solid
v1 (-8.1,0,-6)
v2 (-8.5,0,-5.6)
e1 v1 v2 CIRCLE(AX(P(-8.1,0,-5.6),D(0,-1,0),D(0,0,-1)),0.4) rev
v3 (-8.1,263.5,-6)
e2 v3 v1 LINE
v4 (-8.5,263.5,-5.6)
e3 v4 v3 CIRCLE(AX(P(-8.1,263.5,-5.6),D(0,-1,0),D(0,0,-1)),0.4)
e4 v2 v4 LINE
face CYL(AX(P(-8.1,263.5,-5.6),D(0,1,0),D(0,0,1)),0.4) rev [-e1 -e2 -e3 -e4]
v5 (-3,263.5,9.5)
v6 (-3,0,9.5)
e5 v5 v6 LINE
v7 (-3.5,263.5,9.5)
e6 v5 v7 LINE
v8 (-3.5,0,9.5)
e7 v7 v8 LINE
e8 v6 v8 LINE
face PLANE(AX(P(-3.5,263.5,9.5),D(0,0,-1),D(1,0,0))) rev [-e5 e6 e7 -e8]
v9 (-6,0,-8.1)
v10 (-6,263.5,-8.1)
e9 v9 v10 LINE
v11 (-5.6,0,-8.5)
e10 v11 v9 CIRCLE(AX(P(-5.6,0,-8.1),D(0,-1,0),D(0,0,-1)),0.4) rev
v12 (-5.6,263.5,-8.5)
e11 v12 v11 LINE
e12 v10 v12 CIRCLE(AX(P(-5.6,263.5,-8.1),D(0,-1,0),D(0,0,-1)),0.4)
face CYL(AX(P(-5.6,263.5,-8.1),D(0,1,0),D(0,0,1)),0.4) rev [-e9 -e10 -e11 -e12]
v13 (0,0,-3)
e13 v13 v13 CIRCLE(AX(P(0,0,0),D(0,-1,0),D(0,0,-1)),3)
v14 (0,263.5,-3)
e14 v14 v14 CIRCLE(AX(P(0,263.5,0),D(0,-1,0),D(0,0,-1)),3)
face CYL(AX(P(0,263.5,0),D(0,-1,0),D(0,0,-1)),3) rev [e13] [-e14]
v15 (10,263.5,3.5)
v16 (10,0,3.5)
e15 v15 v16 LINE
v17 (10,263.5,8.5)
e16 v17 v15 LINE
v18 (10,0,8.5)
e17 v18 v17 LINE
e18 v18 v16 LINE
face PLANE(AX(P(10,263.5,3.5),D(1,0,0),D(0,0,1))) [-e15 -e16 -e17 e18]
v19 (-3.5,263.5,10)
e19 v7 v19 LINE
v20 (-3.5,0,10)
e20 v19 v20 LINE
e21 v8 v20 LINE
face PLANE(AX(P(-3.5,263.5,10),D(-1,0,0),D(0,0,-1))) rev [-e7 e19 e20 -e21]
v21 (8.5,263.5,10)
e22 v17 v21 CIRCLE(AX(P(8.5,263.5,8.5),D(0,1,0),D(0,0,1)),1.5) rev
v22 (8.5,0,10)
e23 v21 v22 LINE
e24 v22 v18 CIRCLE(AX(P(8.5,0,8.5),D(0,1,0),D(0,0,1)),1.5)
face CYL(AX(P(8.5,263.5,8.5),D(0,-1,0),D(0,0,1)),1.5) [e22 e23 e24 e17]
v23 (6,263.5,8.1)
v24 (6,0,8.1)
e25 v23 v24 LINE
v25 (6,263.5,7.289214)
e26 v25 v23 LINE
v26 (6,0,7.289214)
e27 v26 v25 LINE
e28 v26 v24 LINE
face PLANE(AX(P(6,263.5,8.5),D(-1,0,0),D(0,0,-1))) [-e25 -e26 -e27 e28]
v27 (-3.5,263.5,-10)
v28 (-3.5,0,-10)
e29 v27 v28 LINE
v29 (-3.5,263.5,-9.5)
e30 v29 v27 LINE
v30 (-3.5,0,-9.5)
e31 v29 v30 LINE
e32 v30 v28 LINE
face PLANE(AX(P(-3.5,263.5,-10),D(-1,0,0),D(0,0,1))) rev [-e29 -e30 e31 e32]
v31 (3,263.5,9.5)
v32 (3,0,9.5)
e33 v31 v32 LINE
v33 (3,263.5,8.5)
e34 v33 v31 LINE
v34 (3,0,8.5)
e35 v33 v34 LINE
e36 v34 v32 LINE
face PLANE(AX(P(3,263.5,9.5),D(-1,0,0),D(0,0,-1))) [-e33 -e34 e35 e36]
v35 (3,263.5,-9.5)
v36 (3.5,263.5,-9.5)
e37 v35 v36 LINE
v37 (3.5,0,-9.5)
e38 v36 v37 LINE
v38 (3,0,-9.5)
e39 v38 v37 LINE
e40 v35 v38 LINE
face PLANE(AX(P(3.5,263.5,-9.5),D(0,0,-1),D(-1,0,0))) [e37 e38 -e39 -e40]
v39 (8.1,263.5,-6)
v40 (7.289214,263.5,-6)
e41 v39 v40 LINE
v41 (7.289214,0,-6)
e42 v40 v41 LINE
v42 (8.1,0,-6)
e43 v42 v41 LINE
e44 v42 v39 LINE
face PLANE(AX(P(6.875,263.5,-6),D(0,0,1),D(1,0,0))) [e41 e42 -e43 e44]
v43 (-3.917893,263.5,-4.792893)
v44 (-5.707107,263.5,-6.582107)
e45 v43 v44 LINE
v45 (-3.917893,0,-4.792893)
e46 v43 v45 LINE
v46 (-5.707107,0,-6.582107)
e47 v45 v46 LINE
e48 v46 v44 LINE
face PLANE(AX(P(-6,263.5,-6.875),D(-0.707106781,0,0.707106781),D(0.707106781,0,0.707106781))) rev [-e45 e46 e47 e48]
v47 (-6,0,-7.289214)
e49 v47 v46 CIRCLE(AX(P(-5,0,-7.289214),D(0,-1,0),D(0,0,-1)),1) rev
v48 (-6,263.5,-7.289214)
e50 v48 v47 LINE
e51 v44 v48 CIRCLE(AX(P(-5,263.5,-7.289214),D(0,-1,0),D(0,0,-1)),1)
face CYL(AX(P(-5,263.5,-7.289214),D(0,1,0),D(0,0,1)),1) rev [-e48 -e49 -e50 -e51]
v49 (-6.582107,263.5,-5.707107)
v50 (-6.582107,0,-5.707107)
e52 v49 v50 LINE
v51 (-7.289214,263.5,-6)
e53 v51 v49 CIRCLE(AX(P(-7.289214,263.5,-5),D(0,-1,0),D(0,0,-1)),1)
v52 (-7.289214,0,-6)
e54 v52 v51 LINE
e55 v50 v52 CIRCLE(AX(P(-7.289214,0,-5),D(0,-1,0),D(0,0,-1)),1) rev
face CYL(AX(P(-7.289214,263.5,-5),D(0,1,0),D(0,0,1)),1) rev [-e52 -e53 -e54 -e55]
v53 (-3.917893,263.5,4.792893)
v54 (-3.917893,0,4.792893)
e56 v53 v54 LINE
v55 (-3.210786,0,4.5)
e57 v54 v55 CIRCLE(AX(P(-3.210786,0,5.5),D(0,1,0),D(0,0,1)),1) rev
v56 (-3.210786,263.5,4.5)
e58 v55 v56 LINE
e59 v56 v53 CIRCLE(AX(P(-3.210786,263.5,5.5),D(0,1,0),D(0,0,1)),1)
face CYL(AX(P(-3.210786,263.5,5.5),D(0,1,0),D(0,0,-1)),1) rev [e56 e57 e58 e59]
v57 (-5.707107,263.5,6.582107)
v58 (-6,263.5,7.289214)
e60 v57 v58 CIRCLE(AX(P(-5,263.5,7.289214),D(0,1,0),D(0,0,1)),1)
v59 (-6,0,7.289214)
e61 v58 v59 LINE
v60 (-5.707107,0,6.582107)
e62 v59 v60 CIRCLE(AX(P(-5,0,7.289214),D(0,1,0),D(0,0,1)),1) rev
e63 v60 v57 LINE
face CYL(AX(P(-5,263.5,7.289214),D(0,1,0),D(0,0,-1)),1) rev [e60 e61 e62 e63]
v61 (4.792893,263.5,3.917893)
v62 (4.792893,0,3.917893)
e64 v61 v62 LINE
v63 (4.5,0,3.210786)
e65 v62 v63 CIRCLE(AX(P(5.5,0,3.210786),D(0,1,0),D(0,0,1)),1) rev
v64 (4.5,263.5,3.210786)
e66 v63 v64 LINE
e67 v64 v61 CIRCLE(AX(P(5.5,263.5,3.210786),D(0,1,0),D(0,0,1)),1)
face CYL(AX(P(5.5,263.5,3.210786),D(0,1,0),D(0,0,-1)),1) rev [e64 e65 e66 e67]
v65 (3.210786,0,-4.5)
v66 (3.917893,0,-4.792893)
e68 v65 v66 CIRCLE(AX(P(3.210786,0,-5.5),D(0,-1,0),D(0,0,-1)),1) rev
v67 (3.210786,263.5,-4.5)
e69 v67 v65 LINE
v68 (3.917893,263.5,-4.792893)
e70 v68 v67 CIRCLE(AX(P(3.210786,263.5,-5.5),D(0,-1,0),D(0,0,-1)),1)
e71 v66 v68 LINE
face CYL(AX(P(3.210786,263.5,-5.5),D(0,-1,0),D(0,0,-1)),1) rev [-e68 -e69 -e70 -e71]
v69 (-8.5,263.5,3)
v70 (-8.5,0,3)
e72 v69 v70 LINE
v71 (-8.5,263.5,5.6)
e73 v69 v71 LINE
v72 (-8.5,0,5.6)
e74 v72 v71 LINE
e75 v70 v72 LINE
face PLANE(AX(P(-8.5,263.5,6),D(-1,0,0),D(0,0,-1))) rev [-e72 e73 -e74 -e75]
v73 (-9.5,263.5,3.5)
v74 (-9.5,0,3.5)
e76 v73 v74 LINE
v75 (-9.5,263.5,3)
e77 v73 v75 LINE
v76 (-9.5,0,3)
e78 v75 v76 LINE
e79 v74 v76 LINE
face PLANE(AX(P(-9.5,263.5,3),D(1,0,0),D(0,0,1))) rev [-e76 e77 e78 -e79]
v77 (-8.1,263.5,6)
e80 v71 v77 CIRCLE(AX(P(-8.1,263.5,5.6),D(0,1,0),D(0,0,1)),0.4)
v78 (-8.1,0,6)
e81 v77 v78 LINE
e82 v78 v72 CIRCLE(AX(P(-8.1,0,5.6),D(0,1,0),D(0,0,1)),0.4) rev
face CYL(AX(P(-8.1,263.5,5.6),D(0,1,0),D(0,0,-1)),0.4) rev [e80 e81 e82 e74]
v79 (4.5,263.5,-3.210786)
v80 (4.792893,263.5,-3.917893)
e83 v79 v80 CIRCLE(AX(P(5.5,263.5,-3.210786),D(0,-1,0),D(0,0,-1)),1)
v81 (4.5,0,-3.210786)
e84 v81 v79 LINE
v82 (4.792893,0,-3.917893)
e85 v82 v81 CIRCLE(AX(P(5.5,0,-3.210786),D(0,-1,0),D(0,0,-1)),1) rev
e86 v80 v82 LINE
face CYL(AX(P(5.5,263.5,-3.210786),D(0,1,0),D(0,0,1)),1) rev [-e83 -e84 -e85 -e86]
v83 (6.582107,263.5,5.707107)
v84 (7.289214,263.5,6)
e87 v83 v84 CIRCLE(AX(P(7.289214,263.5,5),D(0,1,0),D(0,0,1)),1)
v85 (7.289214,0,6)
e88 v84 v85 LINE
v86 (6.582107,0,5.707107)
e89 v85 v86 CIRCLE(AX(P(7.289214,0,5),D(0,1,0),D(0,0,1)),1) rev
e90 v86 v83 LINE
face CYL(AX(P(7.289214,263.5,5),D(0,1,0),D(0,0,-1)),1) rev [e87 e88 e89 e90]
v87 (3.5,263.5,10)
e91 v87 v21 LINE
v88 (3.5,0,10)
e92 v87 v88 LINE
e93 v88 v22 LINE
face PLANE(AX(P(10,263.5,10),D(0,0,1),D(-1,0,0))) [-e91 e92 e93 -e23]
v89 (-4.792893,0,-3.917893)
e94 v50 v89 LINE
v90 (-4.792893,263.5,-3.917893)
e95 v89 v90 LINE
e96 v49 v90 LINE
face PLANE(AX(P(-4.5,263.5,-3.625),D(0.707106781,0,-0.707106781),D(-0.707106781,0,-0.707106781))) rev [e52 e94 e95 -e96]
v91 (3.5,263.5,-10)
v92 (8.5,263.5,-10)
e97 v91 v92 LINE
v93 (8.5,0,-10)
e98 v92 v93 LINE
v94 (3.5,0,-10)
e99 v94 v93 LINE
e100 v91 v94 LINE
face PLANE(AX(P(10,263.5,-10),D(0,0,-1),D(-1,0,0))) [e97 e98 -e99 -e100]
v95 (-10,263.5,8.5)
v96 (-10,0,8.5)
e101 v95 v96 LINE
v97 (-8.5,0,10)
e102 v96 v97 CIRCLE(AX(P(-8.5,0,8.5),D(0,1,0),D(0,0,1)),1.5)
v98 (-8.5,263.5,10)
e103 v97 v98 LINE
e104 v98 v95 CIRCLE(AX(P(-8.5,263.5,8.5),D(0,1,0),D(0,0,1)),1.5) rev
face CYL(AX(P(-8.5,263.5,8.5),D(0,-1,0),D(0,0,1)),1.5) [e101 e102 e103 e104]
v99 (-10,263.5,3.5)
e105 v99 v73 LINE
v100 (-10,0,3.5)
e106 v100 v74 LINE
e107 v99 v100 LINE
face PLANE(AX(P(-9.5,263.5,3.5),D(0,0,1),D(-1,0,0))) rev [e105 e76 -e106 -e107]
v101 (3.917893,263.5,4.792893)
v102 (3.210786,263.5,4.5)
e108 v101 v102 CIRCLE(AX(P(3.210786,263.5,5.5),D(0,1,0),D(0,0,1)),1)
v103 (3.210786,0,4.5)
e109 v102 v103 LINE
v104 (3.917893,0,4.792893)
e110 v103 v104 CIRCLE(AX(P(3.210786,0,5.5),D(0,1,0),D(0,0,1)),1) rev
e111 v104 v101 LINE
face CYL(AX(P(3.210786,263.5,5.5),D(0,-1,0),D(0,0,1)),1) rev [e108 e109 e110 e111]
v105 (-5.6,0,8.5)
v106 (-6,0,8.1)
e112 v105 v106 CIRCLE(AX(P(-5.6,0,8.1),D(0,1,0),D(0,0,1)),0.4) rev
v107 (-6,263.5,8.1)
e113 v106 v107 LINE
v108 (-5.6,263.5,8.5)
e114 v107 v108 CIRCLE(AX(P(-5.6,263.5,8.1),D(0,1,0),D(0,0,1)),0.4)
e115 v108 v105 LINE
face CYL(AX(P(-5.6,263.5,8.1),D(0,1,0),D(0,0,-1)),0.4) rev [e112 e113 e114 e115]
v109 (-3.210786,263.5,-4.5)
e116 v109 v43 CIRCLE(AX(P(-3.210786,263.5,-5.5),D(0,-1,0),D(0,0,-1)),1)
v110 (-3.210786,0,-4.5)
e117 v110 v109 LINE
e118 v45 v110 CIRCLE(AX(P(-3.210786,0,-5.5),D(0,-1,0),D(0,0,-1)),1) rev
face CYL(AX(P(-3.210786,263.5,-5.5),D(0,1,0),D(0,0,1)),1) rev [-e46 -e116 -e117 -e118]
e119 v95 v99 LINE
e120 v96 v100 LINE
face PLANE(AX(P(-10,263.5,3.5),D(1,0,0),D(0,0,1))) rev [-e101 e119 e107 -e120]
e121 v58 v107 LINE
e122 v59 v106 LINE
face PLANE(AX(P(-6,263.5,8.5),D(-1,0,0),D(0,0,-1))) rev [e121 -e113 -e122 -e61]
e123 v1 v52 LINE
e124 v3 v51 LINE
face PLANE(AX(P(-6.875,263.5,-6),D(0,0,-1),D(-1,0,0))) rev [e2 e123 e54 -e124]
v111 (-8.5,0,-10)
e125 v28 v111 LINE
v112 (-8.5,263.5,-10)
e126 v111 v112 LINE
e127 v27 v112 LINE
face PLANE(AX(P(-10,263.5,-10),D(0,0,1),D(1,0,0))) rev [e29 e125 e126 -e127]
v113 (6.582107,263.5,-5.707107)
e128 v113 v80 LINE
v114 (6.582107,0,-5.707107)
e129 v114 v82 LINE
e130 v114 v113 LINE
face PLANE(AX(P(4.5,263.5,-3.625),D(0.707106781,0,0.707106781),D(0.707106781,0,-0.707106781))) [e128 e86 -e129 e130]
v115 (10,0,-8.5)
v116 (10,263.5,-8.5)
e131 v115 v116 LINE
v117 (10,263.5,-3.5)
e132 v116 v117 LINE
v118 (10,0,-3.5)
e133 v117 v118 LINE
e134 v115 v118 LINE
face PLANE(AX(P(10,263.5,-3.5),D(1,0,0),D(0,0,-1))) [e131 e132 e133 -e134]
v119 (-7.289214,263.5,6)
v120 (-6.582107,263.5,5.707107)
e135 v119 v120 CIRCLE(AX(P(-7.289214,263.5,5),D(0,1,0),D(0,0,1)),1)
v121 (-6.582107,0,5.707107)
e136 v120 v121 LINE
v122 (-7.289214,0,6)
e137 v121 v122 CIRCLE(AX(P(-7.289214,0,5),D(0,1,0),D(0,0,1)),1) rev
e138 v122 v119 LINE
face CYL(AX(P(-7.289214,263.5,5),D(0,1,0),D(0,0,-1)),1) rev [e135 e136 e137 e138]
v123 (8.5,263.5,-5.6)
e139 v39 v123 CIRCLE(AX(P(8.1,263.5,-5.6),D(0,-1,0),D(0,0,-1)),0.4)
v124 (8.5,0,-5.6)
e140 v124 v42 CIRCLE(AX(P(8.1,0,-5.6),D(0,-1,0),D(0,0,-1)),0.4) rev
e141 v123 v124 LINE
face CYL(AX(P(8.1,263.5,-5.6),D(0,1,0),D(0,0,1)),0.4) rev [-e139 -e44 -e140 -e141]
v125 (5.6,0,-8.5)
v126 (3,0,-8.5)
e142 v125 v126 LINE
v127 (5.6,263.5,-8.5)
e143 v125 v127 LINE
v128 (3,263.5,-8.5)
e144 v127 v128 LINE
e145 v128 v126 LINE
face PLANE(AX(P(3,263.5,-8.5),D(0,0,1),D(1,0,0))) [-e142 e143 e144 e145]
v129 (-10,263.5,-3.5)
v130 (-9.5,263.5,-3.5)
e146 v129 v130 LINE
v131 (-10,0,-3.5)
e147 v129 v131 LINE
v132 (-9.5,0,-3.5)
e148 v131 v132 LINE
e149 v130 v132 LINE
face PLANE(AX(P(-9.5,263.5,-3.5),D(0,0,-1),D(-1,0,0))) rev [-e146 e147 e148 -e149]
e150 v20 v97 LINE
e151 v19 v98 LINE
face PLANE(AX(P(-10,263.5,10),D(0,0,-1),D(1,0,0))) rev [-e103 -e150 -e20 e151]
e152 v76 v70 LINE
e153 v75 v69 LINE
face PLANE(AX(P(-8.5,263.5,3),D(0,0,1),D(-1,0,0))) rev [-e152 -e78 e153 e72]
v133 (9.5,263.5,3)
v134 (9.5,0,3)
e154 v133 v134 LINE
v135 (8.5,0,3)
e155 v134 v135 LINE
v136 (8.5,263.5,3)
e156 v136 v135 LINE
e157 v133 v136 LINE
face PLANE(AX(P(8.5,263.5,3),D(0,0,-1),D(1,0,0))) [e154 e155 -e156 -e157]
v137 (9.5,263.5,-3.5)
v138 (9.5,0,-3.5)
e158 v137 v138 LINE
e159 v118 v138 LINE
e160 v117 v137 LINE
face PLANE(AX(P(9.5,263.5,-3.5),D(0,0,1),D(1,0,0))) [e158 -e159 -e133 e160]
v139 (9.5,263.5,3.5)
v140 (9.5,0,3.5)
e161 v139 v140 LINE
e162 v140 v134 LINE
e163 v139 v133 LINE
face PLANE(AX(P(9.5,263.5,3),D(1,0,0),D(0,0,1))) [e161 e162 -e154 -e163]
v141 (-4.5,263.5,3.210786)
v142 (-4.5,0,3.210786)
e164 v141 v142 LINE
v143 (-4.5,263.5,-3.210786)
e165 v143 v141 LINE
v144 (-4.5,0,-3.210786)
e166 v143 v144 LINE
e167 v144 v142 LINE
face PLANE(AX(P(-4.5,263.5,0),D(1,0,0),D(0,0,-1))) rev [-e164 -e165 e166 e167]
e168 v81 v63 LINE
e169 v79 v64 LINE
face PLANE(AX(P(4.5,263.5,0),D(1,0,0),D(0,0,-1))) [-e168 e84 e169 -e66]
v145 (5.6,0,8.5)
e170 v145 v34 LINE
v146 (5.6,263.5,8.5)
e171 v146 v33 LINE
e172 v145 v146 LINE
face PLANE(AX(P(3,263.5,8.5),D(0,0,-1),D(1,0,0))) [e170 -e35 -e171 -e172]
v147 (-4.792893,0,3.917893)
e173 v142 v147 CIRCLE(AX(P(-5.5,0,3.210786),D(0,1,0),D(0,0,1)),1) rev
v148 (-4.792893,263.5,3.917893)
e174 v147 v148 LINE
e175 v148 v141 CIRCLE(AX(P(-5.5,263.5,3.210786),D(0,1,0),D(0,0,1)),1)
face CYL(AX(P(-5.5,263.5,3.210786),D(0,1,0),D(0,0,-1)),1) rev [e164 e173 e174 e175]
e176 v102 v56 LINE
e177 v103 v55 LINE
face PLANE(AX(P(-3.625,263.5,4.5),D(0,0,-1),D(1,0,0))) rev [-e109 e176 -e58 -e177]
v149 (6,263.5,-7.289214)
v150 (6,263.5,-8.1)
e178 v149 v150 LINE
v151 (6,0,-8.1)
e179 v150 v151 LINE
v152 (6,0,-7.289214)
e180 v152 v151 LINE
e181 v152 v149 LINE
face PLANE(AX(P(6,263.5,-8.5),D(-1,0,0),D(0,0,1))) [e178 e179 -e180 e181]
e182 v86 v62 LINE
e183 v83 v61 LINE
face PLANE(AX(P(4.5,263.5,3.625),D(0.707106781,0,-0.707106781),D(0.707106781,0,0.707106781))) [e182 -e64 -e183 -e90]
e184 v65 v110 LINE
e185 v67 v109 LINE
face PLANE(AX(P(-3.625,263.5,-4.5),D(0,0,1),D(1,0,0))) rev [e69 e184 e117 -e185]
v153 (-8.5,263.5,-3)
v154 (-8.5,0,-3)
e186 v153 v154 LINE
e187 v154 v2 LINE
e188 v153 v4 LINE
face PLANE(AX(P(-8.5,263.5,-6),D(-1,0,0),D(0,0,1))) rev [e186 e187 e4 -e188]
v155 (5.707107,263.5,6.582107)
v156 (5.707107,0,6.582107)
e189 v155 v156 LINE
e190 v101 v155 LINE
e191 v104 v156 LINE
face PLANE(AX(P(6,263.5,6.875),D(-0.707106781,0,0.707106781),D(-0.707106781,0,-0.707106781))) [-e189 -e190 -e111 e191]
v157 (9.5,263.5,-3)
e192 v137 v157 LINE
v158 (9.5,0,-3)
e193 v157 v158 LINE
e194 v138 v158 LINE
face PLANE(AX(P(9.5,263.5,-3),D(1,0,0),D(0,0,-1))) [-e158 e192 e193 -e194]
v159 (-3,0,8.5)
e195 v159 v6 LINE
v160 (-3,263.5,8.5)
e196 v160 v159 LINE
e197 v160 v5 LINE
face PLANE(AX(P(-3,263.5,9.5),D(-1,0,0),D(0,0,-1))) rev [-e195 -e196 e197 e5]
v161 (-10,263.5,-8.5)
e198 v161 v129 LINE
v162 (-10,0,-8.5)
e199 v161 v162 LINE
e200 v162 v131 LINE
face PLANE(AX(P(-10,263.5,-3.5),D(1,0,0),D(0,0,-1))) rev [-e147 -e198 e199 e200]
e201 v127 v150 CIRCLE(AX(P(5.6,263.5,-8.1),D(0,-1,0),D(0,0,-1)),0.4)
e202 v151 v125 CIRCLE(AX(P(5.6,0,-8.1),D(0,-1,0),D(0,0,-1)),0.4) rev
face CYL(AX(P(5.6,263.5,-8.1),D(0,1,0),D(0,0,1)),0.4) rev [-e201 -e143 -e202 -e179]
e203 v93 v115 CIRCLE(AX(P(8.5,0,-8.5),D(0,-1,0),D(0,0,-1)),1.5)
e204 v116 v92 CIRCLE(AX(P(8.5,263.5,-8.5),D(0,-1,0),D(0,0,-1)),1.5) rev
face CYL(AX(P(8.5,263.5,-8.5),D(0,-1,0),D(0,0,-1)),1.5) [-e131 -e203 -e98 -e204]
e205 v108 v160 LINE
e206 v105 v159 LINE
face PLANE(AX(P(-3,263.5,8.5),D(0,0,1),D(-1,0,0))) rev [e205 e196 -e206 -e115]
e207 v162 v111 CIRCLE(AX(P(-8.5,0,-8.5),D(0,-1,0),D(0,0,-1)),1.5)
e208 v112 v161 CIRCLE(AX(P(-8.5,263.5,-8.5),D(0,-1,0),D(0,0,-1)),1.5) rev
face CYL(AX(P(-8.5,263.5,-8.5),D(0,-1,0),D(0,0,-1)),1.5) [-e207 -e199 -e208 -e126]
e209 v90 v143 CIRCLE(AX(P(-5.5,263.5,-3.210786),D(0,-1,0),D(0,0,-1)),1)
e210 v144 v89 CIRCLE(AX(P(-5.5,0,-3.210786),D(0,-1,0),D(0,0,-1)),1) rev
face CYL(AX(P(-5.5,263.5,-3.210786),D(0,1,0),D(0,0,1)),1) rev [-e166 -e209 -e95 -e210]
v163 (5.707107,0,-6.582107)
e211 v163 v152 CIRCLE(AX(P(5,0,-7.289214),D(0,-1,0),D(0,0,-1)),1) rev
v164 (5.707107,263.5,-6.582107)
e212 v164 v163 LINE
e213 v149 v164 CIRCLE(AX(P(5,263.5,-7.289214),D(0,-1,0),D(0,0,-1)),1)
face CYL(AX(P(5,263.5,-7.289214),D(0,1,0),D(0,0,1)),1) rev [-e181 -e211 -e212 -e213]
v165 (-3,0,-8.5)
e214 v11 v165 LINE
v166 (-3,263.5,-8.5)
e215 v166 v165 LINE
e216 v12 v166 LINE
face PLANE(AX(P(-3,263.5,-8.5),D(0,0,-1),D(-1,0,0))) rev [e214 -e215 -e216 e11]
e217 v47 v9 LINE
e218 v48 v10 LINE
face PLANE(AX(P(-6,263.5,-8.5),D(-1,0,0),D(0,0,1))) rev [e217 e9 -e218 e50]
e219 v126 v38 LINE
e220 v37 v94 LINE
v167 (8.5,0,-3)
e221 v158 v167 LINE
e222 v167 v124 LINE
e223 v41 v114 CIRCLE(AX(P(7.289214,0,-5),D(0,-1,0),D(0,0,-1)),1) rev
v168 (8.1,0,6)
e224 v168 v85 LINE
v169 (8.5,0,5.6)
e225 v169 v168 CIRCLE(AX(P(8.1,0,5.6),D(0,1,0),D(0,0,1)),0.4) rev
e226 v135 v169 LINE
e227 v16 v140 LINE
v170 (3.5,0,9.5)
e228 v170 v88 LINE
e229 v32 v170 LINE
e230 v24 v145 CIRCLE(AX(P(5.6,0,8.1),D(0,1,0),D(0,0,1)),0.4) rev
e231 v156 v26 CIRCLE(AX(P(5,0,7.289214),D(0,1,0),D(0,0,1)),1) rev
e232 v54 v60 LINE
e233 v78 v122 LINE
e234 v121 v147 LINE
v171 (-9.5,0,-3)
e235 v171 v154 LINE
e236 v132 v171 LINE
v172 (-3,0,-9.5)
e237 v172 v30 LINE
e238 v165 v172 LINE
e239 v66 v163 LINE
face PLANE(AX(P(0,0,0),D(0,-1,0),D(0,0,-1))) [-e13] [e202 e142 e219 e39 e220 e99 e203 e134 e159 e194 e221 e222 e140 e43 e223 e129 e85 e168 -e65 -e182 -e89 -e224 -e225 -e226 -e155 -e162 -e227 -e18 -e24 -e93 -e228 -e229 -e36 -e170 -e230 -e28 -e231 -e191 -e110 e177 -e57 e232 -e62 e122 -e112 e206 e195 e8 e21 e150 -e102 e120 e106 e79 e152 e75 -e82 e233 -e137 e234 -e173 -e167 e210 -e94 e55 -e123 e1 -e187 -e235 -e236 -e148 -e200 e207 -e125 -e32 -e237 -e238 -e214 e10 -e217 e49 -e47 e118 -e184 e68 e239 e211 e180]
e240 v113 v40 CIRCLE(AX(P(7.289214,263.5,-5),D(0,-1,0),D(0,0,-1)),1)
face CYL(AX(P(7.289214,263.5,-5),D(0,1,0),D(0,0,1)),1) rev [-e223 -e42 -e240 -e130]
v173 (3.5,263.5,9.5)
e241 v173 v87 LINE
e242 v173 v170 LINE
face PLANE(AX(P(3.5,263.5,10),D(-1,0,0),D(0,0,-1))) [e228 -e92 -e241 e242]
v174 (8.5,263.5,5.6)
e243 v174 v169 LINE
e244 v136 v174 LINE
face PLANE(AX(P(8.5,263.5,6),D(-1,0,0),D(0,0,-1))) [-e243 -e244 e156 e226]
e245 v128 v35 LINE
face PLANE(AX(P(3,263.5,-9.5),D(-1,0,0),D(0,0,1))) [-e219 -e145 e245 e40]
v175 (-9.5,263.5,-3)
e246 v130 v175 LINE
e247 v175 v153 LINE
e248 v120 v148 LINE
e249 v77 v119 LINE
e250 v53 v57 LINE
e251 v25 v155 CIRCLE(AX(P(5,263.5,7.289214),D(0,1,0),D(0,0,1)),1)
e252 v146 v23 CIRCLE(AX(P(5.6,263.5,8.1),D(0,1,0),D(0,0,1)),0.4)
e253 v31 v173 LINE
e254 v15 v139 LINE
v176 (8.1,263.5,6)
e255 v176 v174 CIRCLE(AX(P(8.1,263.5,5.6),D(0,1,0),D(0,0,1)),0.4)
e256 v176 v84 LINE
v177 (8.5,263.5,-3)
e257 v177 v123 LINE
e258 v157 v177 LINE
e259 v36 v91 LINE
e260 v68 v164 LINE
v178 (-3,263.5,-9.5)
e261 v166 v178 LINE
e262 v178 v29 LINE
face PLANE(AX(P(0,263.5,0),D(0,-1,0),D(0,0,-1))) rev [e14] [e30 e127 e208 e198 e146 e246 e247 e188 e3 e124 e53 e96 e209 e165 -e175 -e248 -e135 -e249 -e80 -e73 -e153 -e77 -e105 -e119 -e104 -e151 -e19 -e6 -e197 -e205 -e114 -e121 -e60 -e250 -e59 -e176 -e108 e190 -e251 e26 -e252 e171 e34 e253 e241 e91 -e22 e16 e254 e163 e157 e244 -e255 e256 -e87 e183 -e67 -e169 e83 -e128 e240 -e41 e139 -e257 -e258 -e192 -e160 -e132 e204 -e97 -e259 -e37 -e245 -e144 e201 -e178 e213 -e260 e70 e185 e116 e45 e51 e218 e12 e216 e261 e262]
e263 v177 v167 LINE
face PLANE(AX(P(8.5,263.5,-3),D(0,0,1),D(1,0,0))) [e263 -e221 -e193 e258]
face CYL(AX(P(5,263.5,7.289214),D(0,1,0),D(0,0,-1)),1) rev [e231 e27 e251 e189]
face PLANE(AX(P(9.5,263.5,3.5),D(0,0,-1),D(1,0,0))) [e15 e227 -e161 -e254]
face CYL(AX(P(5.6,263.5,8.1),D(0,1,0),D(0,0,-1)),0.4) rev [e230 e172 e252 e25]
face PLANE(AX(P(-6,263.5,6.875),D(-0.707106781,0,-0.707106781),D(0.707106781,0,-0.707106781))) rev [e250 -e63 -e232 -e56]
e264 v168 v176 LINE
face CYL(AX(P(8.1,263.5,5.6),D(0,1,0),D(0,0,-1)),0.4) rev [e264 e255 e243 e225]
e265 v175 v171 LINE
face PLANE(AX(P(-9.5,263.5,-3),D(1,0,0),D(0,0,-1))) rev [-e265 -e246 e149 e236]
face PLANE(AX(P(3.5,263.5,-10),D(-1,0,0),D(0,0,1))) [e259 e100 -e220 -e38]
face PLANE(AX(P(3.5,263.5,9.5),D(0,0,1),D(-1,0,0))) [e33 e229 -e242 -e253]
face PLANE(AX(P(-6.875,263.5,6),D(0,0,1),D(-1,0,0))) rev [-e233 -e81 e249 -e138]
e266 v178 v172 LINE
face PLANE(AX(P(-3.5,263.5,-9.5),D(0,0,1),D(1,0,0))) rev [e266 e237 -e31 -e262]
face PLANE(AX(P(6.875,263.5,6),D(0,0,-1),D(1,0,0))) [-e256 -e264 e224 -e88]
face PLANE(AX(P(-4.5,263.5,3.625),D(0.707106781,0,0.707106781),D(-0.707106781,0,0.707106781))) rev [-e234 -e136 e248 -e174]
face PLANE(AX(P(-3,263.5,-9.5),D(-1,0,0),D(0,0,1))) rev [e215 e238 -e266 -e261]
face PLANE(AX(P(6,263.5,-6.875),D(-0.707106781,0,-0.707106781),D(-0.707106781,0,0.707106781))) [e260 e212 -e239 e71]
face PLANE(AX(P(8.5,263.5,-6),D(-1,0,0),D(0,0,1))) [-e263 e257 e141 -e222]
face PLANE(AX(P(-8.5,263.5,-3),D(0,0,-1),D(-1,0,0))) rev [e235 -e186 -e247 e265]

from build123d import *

# Parameters (mm, degrees)
BOSS_EXTRU_1_CORPS_DEPTH    = 263.5
CONG_1_R                    = 1.5
CONG_2_R                    = 0.4
CONG_4_R                    = 1
CONG_1_OF_SYM_TRIE_BRAS_R   = 1.5
CONG_2_OF_SYM_TRIE_BRAS_R   = 0.4
CONG_4_OF_SYM_TRIE_BRAS_R   = 1
SYM_TRIE_BRAS_DOUBLE_DEPTH  = 263.5
APR_S_TARODAGE_M6_R         = 3
ENL_V_MAT_FILETAGE_M6_DEPTH = 264.879233741


# Read off the part's stored shape, not the designer's step: Symétrie Bras double
with BuildPart() as part:
    # Esquisse4 → Boss.-Extru.1 Corps (new body)
    with BuildSketch(Plane(origin=(0, 0, 0), x_dir=(1, 0, 0), z_dir=(0, 1, 0))):
        Polygon((0, 0), (-4.5, 0), (-4.5, 3.625), (-6.875, 6), (-8.5, 6), (-8.5, 3), (-9.5, 3), (-9.5, 3.5), (-10, 3.5), (-10, 10), (-3.5, 10), (-3.5, 9.5), (-3, 9.5), (-3, 8.5), (-6, 8.5), (-6, 6.875), (-3.625, 4.5), (0, 4.5), align=None)
    boss_extru_1_corps = extrude(amount=BOSS_EXTRU_1_CORPS_DEPTH)

    # Congé1
    cong_1_edges = [part.edges().sort_by_distance(p)[0] for p in [
        (-10, 131.75, -10),
    ]]
    fillet(cong_1_edges, radius=CONG_1_R)

    # Congé2
    cong_2_edges = [part.edges().sort_by_distance(p)[0] for p in [
        (-8.5, 131.75, -6),
        (-6, 131.75, -8.5),
    ]]
    fillet(cong_2_edges, radius=CONG_2_R)

    # Congé4
    cong_4_edges = [part.edges().sort_by_distance(p)[0] for p in [
        (-4.5, 131.75, -3.625),
        (-6.875, 131.75, -6),
        (-6, 131.75, -6.875),
        (-3.625, 131.75, -4.5),
    ]]
    fillet(cong_4_edges, radius=CONG_4_R)

    # Symétrie Bras: Boss.-Extru.1 Corps across plane
    add(boss_extru_1_corps.mirror(Plane(origin=(0, 263.5, -4.5), x_dir=(0, 0, 1), z_dir=(-1, 0, 0))))

    # Congé1 of Symétrie Bras
    cong_1_of_sym_trie_bras_edges = [part.edges().sort_by_distance(p)[0] for p in [
        (10, 131.75, -10),
    ]]
    fillet(cong_1_of_sym_trie_bras_edges, radius=CONG_1_OF_SYM_TRIE_BRAS_R)

    # Congé2 of Symétrie Bras
    cong_2_of_sym_trie_bras_edges = [part.edges().sort_by_distance(p)[0] for p in [
        (8.5, 131.75, -6),
        (6, 131.75, -8.5),
    ]]
    fillet(cong_2_of_sym_trie_bras_edges, radius=CONG_2_OF_SYM_TRIE_BRAS_R)

    # Congé4 of Symétrie Bras
    cong_4_of_sym_trie_bras_edges = [part.edges().sort_by_distance(p)[0] for p in [
        (4.5, 131.75, -3.625),
        (6.875, 131.75, -6),
        (6, 131.75, -6.875),
        (3.625, 131.75, -4.5),
    ]]
    fillet(cong_4_of_sym_trie_bras_edges, radius=CONG_4_OF_SYM_TRIE_BRAS_R)

    # Symétrie Bras double outline → Symétrie Bras double (add)
    with BuildSketch(Plane(origin=(0, 0, 0), x_dir=(1, 0, 0), z_dir=(0, 1, 0))):
        with BuildLine():
            ThreePointArc((7.289213562, -6), (6.90653013, -5.923879533), (6.582106781, -5.707106781))
            Line((6.582106781, -5.707106781), (4.792893219, -3.917893219))
            ThreePointArc((4.792893219, -3.917893219), (4.576120467, -3.59346987), (4.5, -3.210786438))
            Line((4.5, -3.210786438), (4.5, 0))
            Line((4.5, 0), (-4.5, 0))
            Line((-4.5, 0), (-4.5, -3.210786438))
            ThreePointArc((-4.5, -3.210786438), (-4.576120467, -3.59346987), (-4.792893219, -3.917893219))
            Line((-4.792893219, -3.917893219), (-6.582106781, -5.707106781))
            ThreePointArc((-6.582106781, -5.707106781), (-6.90653013, -5.923879533), (-7.289213562, -6))
            Line((-7.289213562, -6), (-8.1, -6))
            ThreePointArc((-8.1, -6), (-8.382842712, -5.882842712), (-8.5, -5.6))
            Line((-8.5, -5.6), (-8.5, -3))
            Line((-8.5, -3), (-9.5, -3))
            Line((-9.5, -3), (-9.5, -3.5))
            Line((-9.5, -3.5), (-10, -3.5))
            Line((-10, -3.5), (-10, -8.5))
            ThreePointArc((-10, -8.5), (-9.560660172, -9.560660172), (-8.5, -10))
            Line((-8.5, -10), (-3.5, -10))
            Line((-3.5, -10), (-3.5, -9.5))
            Line((-3.5, -9.5), (-3, -9.5))
            Line((-3, -9.5), (-3, -8.5))
            Line((-3, -8.5), (-5.6, -8.5))
            ThreePointArc((-5.6, -8.5), (-5.882842712, -8.382842712), (-6, -8.1))
            Line((-6, -8.1), (-6, -7.289213562))
            ThreePointArc((-6, -7.289213562), (-5.923879533, -6.90653013), (-5.707106781, -6.582106781))
            Line((-5.707106781, -6.582106781), (-3.917893219, -4.792893219))
            ThreePointArc((-3.917893219, -4.792893219), (-3.59346987, -4.576120467), (-3.210786438, -4.5))
            Line((-3.210786438, -4.5), (3.210786438, -4.5))
            ThreePointArc((3.210786438, -4.5), (3.59346987, -4.576120467), (3.917893219, -4.792893219))
            Line((3.917893219, -4.792893219), (5.707106781, -6.582106781))
            ThreePointArc((5.707106781, -6.582106781), (5.923879533, -6.90653013), (6, -7.289213562))
            Line((6, -7.289213562), (6, -8.1))
            ThreePointArc((6, -8.1), (5.882842712, -8.382842712), (5.6, -8.5))
            Line((5.6, -8.5), (3, -8.5))
            Line((3, -8.5), (3, -9.5))
            Line((3, -9.5), (3.5, -9.5))
            Line((3.5, -9.5), (3.5, -10))
            Line((3.5, -10), (8.5, -10))
            ThreePointArc((8.5, -10), (9.560660172, -9.560660172), (10, -8.5))
            Line((10, -8.5), (10, -3.5))
            Line((10, -3.5), (9.5, -3.5))
            Line((9.5, -3.5), (9.5, -3))
            Line((9.5, -3), (8.5, -3))
            Line((8.5, -3), (8.5, -5.6))
            ThreePointArc((8.5, -5.6), (8.382842712, -5.882842712), (8.1, -6))
            Line((8.1, -6), (7.289213562, -6))
        make_face()
    extrude(amount=SYM_TRIE_BRAS_DOUBLE_DEPTH)

    # Après tarodage M6 → Enlèv. mat.-Filetage M6 (cut, through all)
    with BuildSketch(Plane.XZ):
        with Locations(Location((0, 0, 0), (0, 0, 270))):
            Circle(APR_S_TARODAGE_M6_R)
    extrude(amount=-ENL_V_MAT_FILETAGE_M6_DEPTH, mode=Mode.SUBTRACT)


solid = part.part
